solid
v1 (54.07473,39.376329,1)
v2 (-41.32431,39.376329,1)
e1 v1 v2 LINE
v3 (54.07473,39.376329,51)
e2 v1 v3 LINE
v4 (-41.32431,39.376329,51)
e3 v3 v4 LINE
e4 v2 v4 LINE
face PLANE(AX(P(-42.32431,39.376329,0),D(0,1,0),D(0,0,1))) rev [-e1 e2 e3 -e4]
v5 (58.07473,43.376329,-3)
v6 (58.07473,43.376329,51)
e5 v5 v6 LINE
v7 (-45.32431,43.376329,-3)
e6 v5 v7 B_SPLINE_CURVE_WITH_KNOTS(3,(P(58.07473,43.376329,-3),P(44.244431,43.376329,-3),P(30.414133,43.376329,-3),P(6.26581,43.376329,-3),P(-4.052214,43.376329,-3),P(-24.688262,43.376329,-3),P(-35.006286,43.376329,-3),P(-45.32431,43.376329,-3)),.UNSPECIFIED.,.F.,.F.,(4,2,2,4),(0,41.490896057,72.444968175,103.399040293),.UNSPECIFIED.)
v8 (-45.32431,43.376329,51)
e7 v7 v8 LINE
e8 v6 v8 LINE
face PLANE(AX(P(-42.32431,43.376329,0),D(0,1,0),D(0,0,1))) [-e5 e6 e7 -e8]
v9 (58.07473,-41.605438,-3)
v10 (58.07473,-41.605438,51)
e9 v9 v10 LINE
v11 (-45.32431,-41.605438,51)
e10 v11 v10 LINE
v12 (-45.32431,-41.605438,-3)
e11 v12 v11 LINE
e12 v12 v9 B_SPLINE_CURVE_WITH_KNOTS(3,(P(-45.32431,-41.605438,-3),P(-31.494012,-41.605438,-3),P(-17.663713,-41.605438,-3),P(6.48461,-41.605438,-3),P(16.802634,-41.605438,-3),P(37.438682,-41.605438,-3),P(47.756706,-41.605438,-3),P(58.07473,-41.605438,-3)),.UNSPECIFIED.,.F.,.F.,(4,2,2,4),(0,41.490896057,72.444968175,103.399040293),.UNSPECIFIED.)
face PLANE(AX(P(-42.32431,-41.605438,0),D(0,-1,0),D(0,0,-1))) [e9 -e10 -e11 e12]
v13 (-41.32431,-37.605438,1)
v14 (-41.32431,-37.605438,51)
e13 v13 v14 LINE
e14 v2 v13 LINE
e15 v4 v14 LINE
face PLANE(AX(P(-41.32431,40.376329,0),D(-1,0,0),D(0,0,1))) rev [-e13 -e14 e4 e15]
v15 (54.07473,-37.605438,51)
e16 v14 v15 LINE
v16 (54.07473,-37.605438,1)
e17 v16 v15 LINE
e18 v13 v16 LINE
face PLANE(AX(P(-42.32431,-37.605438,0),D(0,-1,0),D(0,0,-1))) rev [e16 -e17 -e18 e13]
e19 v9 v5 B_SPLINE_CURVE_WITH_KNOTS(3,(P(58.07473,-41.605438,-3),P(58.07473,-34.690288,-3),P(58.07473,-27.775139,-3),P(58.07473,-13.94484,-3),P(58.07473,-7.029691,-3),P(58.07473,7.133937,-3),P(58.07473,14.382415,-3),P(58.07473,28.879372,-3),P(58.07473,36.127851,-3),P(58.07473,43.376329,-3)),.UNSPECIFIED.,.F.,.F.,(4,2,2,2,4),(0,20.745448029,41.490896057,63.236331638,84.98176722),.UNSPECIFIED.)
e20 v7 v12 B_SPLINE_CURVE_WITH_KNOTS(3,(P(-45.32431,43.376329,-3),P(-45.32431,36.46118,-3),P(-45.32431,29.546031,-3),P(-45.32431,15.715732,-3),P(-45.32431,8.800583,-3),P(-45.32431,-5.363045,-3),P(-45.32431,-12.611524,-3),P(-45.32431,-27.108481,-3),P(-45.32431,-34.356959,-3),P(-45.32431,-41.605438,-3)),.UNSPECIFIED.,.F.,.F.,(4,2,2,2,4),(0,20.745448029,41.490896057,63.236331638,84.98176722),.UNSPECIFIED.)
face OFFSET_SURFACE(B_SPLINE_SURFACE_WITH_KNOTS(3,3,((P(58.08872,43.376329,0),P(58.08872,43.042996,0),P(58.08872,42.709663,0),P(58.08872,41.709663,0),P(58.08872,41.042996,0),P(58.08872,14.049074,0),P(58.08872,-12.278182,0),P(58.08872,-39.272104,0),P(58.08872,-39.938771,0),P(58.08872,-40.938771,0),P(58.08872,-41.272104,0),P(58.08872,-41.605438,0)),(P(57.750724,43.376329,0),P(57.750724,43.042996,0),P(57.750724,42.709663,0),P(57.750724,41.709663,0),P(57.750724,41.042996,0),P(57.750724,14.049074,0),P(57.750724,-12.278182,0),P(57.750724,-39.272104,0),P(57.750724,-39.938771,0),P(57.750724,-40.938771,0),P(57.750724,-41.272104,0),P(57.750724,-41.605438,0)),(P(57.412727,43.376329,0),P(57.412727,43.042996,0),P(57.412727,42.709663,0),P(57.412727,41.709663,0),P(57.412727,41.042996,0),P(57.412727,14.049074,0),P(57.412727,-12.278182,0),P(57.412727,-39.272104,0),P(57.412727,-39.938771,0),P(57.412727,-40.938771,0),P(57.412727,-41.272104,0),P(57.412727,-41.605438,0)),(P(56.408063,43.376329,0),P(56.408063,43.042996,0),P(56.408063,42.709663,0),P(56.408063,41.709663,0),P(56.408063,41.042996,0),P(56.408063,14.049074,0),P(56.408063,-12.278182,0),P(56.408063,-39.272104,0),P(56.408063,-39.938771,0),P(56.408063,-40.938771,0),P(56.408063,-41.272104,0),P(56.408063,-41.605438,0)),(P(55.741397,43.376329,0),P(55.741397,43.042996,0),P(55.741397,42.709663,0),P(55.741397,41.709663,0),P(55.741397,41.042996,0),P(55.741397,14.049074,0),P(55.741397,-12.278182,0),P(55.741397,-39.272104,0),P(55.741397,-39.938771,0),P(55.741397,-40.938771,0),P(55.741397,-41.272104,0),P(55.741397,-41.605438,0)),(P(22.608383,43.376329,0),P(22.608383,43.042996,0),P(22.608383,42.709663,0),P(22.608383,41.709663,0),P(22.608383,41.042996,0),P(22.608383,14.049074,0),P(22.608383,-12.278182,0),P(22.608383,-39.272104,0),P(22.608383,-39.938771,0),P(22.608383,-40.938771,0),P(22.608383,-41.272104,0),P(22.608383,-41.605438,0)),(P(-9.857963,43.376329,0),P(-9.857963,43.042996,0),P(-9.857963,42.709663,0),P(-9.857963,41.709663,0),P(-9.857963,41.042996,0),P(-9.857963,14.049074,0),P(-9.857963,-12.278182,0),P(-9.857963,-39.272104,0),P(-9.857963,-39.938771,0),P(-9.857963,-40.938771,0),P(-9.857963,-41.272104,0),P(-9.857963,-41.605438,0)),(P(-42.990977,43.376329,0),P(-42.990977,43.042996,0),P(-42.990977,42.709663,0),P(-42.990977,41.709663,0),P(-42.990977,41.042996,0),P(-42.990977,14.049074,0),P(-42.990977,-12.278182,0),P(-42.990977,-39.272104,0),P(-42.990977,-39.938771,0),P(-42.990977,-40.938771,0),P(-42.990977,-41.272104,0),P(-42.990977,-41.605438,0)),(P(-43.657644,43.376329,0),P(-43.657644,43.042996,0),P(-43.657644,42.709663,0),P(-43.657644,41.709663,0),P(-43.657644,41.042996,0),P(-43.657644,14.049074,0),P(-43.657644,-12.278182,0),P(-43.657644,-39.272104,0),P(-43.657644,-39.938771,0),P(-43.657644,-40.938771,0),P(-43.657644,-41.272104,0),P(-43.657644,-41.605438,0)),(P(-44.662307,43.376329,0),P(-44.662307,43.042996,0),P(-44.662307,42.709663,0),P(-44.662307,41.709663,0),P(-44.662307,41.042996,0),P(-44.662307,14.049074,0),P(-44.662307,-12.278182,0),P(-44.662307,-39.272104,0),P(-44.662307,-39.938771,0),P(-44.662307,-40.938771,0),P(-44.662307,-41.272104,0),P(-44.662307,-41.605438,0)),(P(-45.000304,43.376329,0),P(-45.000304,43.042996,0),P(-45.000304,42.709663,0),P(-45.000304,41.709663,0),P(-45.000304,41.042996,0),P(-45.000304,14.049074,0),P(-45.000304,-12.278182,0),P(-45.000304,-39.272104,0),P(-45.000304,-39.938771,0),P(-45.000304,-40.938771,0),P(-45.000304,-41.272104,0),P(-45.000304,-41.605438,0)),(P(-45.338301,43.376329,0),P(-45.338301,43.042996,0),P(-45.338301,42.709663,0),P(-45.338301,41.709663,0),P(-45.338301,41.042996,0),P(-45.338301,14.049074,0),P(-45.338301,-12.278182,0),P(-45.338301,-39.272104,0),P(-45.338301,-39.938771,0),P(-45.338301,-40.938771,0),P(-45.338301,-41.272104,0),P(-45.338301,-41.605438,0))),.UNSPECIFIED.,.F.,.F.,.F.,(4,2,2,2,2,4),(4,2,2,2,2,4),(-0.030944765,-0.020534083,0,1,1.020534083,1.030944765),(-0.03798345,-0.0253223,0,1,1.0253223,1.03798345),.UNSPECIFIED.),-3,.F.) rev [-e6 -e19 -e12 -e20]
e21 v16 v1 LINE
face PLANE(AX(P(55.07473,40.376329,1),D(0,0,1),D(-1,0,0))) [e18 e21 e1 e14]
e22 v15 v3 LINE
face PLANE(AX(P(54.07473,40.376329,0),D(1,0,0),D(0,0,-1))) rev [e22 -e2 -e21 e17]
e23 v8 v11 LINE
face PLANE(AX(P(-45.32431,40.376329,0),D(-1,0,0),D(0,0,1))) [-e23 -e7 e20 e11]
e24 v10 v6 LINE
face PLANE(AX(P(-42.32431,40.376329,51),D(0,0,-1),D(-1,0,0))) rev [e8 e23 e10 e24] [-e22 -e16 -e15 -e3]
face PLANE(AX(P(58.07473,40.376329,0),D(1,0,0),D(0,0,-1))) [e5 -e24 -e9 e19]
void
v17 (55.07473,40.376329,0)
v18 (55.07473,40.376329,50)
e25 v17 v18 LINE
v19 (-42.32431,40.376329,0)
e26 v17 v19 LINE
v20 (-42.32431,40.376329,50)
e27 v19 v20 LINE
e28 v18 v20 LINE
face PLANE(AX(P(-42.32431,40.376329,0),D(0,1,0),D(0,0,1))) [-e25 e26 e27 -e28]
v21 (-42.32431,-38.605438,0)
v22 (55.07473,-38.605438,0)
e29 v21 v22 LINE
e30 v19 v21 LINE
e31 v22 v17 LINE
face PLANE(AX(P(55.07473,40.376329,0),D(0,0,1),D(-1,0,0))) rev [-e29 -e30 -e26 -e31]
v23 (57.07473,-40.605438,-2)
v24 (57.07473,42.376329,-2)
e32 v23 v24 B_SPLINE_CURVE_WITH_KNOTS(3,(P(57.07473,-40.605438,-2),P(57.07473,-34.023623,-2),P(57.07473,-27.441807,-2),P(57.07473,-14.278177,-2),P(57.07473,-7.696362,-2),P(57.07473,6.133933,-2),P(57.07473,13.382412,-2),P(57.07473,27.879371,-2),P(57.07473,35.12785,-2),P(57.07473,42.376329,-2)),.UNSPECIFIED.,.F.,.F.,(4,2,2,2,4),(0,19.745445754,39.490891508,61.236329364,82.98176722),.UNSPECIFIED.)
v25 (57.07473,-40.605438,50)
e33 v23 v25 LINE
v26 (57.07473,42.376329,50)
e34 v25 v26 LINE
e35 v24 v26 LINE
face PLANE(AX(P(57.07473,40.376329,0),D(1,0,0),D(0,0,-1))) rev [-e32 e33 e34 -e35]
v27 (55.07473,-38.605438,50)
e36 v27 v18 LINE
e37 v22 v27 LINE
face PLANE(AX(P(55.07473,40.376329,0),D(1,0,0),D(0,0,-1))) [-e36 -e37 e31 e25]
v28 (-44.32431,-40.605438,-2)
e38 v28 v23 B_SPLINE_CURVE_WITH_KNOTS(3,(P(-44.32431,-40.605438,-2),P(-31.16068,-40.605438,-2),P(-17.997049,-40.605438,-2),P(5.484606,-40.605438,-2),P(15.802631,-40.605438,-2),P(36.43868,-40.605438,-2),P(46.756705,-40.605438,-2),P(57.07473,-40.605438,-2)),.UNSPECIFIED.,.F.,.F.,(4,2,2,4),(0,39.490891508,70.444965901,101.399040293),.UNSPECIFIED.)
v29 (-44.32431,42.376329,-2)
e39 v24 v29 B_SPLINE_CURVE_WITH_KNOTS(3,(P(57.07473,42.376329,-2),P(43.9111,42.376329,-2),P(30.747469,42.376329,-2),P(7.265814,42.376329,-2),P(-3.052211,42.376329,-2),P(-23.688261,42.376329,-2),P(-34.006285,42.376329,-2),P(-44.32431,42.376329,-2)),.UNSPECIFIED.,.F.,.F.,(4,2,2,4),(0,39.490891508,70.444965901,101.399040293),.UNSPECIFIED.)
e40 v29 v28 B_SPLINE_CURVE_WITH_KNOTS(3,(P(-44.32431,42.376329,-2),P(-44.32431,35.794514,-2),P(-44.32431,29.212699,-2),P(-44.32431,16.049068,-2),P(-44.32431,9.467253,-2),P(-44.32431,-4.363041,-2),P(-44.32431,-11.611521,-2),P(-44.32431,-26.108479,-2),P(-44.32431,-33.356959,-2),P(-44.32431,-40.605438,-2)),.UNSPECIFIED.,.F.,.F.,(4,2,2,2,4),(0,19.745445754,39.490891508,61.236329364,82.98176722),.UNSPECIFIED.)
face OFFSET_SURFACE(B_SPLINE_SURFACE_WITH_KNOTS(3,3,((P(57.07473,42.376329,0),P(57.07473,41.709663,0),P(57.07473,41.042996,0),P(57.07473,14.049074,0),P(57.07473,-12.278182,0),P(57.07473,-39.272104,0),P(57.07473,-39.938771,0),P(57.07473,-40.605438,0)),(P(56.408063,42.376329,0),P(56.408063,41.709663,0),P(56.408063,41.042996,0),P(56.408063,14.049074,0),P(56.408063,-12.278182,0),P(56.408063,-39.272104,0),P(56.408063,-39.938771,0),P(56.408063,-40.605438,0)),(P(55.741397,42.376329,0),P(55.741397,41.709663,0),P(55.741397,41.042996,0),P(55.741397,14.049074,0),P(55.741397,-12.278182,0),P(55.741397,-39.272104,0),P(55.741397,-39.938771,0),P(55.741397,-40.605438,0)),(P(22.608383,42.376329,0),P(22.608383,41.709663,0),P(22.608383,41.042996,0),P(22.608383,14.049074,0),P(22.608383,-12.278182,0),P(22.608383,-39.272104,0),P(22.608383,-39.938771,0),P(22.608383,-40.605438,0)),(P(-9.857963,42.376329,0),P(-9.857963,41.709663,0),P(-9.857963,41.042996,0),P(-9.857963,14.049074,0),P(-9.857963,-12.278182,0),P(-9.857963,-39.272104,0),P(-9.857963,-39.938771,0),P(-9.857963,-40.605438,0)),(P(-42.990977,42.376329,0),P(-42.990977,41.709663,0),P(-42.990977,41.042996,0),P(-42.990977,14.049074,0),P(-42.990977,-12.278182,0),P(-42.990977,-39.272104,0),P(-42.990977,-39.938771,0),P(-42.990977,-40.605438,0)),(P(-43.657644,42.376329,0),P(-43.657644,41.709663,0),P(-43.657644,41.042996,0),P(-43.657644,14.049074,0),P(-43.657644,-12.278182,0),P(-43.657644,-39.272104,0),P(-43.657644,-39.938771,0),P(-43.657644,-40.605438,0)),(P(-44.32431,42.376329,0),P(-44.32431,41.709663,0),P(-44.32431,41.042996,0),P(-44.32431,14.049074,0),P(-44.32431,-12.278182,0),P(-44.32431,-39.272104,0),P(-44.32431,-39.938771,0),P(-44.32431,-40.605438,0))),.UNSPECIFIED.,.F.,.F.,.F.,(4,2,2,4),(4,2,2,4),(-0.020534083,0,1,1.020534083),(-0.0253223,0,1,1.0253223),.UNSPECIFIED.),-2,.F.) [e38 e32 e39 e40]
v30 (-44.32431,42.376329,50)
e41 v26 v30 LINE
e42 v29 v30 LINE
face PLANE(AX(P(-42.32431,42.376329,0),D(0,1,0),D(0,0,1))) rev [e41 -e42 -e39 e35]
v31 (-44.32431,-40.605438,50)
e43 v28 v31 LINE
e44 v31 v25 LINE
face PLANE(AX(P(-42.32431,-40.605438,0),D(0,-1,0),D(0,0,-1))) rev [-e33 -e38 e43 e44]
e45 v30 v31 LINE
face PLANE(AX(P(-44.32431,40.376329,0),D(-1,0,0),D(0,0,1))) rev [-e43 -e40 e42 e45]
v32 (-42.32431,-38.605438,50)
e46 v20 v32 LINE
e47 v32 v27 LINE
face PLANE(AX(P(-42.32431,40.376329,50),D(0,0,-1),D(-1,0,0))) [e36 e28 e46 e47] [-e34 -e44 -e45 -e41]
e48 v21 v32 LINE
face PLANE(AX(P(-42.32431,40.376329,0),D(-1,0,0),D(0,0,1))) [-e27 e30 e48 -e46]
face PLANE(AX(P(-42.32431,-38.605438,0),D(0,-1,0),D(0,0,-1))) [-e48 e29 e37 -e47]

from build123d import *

# Parameters (mm, degrees)
SHEET_EXTRUDE_1_2_DEPTH = 50
SKETCH_1_2_W            = 97.399040294
SKETCH_1_2_H            = 78.98176722
THICKEN_1_T1            = 2
SHELL_START             = -3.0000001
SHELL_1_OUTLINE_W       = 103.399040294
SHELL_1_OUTLINE_H       = 84.98176722
SHELL_1_OUTLINE_W_2     = 95.399040294
SHELL_1_OUTLINE_H_2     = 76.98176722
SHELL_1_DEPTH           = 54.0000001
SHELL_1_2_OUTLINE_W     = 95.399040294
SHELL_1_2_OUTLINE_H     = 76.98176722
SHELL_1_2_DEPTH         = 4.0000001
SHELL_START_2           = -44.324310237
SHELL_1_3_DEPTH         = 101.399040294
SHELL_1_4_OUTLINE_W     = 78.98176722
SHELL_1_4_OUTLINE_H     = 50
SHELL_1_4_DEPTH         = 2
SHELL_START_3           = 55.074730057
SHELL_1_5_OUTLINE_W     = 78.98176722
SHELL_1_5_OUTLINE_H     = 50
SHELL_1_5_DEPTH         = 2


with BuildPart() as body_1:
    # Sheet Extrude 1: a surface, the sketch's curves swept straight by 50 mm
    with BuildLine(Plane.XY, mode=Mode.PRIVATE) as sheet_extrude_1_2_path:
        Line((-42.324310237, 40.376329431), (55.074730057, 40.376329431))
        Line((55.074730057, 40.376329431), (55.074730057, -38.605437789))
        Line((55.074730057, -38.605437789), (-42.324310237, -38.605437789))
        Line((-42.324310237, -38.605437789), (-42.324310237, 40.376329431))
    sheet_extrude_1_2 = Shell.extrude(sheet_extrude_1_2_path.wire(), (0 * SHEET_EXTRUDE_1_2_DEPTH, 0 * SHEET_EXTRUDE_1_2_DEPTH, 1 * SHEET_EXTRUDE_1_2_DEPTH))
    # Эскиз1<2> → Sheet Fill 1: a flat surface bounded by the sketch
    with BuildSketch(Plane.XY, mode=Mode.PRIVATE) as sheet_fill_1_3_region:
        with Locations((6.37520991, 0.885445821)):
            Rectangle(SKETCH_1_2_W, SKETCH_1_2_H)
    sheet_fill_1_3 = sheet_fill_1_3_region.sketch.faces()[0]
    # Knit 1: the surfaces knitted into one
    knit_1_1 = Shell(Face.sew_faces(sheet_extrude_1_2.faces() + sheet_fill_1_3.faces())[0])
    add(Solid.thicken(knit_1_1, THICKEN_1_T1))

    # Оболочка1: read off the stored shape, not the designer's step
    # Оболочка1 outline → Оболочка1 (add)
    with BuildSketch(Plane.XY.offset(SHELL_START)):
        with Locations((6.37520991, 0.885445821)):
            Rectangle(SHELL_1_OUTLINE_W, SHELL_1_OUTLINE_H)
        with Locations((6.37520991, 0.885445821)):
            Rectangle(SHELL_1_OUTLINE_W_2, SHELL_1_OUTLINE_H_2, mode=Mode.SUBTRACT)
    extrude(amount=SHELL_1_DEPTH)

    # Shell 1 2 outline → Shell 1 2 (add)
    with BuildSketch(Plane.XY.offset(SHELL_START)):
        with Locations((6.37520991, 0.885445821)):
            Rectangle(SHELL_1_2_OUTLINE_W, SHELL_1_2_OUTLINE_H)
    extrude(amount=SHELL_1_2_DEPTH)

    # Shell 1 3 outline → Shell 1 3 (cut)
    with BuildSketch(Plane.YZ.offset(SHELL_START_2)):
        with BuildLine():
            add(Edge.make_bspline(
                [(42.376329431, -2), (-40.605437789, -2)],
                knots=[-0.0253223, -0.0253223, 1.0253223, 1.0253223], degree=1))
            Line((42.376329431, -2), (42.376329431, 50))
            Line((42.376329431, 50), (40.376329431, 50))
            Line((40.376329431, 50), (40.376329431, 0))
            Line((40.376329431, 0), (-38.605437789, 0))
            Line((-38.605437789, 0), (-38.605437789, 50))
            Line((-38.605437789, 50), (-40.605437789, 50))
            Line((-40.605437789, 50), (-40.605437789, -2))
        make_face()
    extrude(amount=SHELL_1_3_DEPTH, mode=Mode.SUBTRACT)

    # Shell 1 4 outline → Shell 1 4 (cut)
    with BuildSketch(Plane.YZ.offset(SHELL_START_2)):
        with Locations((0.885445821, 25)):
            Rectangle(SHELL_1_4_OUTLINE_W, SHELL_1_4_OUTLINE_H)
    extrude(amount=SHELL_1_4_DEPTH, mode=Mode.SUBTRACT)

    # Shell 1 5 outline → Shell 1 5 (cut)
    with BuildSketch(Plane.YZ.offset(SHELL_START_3)):
        with Locations((0.885445821, 25)):
            Rectangle(SHELL_1_5_OUTLINE_W, SHELL_1_5_OUTLINE_H)
    extrude(amount=SHELL_1_5_DEPTH, mode=Mode.SUBTRACT)


solid = body_1.part
